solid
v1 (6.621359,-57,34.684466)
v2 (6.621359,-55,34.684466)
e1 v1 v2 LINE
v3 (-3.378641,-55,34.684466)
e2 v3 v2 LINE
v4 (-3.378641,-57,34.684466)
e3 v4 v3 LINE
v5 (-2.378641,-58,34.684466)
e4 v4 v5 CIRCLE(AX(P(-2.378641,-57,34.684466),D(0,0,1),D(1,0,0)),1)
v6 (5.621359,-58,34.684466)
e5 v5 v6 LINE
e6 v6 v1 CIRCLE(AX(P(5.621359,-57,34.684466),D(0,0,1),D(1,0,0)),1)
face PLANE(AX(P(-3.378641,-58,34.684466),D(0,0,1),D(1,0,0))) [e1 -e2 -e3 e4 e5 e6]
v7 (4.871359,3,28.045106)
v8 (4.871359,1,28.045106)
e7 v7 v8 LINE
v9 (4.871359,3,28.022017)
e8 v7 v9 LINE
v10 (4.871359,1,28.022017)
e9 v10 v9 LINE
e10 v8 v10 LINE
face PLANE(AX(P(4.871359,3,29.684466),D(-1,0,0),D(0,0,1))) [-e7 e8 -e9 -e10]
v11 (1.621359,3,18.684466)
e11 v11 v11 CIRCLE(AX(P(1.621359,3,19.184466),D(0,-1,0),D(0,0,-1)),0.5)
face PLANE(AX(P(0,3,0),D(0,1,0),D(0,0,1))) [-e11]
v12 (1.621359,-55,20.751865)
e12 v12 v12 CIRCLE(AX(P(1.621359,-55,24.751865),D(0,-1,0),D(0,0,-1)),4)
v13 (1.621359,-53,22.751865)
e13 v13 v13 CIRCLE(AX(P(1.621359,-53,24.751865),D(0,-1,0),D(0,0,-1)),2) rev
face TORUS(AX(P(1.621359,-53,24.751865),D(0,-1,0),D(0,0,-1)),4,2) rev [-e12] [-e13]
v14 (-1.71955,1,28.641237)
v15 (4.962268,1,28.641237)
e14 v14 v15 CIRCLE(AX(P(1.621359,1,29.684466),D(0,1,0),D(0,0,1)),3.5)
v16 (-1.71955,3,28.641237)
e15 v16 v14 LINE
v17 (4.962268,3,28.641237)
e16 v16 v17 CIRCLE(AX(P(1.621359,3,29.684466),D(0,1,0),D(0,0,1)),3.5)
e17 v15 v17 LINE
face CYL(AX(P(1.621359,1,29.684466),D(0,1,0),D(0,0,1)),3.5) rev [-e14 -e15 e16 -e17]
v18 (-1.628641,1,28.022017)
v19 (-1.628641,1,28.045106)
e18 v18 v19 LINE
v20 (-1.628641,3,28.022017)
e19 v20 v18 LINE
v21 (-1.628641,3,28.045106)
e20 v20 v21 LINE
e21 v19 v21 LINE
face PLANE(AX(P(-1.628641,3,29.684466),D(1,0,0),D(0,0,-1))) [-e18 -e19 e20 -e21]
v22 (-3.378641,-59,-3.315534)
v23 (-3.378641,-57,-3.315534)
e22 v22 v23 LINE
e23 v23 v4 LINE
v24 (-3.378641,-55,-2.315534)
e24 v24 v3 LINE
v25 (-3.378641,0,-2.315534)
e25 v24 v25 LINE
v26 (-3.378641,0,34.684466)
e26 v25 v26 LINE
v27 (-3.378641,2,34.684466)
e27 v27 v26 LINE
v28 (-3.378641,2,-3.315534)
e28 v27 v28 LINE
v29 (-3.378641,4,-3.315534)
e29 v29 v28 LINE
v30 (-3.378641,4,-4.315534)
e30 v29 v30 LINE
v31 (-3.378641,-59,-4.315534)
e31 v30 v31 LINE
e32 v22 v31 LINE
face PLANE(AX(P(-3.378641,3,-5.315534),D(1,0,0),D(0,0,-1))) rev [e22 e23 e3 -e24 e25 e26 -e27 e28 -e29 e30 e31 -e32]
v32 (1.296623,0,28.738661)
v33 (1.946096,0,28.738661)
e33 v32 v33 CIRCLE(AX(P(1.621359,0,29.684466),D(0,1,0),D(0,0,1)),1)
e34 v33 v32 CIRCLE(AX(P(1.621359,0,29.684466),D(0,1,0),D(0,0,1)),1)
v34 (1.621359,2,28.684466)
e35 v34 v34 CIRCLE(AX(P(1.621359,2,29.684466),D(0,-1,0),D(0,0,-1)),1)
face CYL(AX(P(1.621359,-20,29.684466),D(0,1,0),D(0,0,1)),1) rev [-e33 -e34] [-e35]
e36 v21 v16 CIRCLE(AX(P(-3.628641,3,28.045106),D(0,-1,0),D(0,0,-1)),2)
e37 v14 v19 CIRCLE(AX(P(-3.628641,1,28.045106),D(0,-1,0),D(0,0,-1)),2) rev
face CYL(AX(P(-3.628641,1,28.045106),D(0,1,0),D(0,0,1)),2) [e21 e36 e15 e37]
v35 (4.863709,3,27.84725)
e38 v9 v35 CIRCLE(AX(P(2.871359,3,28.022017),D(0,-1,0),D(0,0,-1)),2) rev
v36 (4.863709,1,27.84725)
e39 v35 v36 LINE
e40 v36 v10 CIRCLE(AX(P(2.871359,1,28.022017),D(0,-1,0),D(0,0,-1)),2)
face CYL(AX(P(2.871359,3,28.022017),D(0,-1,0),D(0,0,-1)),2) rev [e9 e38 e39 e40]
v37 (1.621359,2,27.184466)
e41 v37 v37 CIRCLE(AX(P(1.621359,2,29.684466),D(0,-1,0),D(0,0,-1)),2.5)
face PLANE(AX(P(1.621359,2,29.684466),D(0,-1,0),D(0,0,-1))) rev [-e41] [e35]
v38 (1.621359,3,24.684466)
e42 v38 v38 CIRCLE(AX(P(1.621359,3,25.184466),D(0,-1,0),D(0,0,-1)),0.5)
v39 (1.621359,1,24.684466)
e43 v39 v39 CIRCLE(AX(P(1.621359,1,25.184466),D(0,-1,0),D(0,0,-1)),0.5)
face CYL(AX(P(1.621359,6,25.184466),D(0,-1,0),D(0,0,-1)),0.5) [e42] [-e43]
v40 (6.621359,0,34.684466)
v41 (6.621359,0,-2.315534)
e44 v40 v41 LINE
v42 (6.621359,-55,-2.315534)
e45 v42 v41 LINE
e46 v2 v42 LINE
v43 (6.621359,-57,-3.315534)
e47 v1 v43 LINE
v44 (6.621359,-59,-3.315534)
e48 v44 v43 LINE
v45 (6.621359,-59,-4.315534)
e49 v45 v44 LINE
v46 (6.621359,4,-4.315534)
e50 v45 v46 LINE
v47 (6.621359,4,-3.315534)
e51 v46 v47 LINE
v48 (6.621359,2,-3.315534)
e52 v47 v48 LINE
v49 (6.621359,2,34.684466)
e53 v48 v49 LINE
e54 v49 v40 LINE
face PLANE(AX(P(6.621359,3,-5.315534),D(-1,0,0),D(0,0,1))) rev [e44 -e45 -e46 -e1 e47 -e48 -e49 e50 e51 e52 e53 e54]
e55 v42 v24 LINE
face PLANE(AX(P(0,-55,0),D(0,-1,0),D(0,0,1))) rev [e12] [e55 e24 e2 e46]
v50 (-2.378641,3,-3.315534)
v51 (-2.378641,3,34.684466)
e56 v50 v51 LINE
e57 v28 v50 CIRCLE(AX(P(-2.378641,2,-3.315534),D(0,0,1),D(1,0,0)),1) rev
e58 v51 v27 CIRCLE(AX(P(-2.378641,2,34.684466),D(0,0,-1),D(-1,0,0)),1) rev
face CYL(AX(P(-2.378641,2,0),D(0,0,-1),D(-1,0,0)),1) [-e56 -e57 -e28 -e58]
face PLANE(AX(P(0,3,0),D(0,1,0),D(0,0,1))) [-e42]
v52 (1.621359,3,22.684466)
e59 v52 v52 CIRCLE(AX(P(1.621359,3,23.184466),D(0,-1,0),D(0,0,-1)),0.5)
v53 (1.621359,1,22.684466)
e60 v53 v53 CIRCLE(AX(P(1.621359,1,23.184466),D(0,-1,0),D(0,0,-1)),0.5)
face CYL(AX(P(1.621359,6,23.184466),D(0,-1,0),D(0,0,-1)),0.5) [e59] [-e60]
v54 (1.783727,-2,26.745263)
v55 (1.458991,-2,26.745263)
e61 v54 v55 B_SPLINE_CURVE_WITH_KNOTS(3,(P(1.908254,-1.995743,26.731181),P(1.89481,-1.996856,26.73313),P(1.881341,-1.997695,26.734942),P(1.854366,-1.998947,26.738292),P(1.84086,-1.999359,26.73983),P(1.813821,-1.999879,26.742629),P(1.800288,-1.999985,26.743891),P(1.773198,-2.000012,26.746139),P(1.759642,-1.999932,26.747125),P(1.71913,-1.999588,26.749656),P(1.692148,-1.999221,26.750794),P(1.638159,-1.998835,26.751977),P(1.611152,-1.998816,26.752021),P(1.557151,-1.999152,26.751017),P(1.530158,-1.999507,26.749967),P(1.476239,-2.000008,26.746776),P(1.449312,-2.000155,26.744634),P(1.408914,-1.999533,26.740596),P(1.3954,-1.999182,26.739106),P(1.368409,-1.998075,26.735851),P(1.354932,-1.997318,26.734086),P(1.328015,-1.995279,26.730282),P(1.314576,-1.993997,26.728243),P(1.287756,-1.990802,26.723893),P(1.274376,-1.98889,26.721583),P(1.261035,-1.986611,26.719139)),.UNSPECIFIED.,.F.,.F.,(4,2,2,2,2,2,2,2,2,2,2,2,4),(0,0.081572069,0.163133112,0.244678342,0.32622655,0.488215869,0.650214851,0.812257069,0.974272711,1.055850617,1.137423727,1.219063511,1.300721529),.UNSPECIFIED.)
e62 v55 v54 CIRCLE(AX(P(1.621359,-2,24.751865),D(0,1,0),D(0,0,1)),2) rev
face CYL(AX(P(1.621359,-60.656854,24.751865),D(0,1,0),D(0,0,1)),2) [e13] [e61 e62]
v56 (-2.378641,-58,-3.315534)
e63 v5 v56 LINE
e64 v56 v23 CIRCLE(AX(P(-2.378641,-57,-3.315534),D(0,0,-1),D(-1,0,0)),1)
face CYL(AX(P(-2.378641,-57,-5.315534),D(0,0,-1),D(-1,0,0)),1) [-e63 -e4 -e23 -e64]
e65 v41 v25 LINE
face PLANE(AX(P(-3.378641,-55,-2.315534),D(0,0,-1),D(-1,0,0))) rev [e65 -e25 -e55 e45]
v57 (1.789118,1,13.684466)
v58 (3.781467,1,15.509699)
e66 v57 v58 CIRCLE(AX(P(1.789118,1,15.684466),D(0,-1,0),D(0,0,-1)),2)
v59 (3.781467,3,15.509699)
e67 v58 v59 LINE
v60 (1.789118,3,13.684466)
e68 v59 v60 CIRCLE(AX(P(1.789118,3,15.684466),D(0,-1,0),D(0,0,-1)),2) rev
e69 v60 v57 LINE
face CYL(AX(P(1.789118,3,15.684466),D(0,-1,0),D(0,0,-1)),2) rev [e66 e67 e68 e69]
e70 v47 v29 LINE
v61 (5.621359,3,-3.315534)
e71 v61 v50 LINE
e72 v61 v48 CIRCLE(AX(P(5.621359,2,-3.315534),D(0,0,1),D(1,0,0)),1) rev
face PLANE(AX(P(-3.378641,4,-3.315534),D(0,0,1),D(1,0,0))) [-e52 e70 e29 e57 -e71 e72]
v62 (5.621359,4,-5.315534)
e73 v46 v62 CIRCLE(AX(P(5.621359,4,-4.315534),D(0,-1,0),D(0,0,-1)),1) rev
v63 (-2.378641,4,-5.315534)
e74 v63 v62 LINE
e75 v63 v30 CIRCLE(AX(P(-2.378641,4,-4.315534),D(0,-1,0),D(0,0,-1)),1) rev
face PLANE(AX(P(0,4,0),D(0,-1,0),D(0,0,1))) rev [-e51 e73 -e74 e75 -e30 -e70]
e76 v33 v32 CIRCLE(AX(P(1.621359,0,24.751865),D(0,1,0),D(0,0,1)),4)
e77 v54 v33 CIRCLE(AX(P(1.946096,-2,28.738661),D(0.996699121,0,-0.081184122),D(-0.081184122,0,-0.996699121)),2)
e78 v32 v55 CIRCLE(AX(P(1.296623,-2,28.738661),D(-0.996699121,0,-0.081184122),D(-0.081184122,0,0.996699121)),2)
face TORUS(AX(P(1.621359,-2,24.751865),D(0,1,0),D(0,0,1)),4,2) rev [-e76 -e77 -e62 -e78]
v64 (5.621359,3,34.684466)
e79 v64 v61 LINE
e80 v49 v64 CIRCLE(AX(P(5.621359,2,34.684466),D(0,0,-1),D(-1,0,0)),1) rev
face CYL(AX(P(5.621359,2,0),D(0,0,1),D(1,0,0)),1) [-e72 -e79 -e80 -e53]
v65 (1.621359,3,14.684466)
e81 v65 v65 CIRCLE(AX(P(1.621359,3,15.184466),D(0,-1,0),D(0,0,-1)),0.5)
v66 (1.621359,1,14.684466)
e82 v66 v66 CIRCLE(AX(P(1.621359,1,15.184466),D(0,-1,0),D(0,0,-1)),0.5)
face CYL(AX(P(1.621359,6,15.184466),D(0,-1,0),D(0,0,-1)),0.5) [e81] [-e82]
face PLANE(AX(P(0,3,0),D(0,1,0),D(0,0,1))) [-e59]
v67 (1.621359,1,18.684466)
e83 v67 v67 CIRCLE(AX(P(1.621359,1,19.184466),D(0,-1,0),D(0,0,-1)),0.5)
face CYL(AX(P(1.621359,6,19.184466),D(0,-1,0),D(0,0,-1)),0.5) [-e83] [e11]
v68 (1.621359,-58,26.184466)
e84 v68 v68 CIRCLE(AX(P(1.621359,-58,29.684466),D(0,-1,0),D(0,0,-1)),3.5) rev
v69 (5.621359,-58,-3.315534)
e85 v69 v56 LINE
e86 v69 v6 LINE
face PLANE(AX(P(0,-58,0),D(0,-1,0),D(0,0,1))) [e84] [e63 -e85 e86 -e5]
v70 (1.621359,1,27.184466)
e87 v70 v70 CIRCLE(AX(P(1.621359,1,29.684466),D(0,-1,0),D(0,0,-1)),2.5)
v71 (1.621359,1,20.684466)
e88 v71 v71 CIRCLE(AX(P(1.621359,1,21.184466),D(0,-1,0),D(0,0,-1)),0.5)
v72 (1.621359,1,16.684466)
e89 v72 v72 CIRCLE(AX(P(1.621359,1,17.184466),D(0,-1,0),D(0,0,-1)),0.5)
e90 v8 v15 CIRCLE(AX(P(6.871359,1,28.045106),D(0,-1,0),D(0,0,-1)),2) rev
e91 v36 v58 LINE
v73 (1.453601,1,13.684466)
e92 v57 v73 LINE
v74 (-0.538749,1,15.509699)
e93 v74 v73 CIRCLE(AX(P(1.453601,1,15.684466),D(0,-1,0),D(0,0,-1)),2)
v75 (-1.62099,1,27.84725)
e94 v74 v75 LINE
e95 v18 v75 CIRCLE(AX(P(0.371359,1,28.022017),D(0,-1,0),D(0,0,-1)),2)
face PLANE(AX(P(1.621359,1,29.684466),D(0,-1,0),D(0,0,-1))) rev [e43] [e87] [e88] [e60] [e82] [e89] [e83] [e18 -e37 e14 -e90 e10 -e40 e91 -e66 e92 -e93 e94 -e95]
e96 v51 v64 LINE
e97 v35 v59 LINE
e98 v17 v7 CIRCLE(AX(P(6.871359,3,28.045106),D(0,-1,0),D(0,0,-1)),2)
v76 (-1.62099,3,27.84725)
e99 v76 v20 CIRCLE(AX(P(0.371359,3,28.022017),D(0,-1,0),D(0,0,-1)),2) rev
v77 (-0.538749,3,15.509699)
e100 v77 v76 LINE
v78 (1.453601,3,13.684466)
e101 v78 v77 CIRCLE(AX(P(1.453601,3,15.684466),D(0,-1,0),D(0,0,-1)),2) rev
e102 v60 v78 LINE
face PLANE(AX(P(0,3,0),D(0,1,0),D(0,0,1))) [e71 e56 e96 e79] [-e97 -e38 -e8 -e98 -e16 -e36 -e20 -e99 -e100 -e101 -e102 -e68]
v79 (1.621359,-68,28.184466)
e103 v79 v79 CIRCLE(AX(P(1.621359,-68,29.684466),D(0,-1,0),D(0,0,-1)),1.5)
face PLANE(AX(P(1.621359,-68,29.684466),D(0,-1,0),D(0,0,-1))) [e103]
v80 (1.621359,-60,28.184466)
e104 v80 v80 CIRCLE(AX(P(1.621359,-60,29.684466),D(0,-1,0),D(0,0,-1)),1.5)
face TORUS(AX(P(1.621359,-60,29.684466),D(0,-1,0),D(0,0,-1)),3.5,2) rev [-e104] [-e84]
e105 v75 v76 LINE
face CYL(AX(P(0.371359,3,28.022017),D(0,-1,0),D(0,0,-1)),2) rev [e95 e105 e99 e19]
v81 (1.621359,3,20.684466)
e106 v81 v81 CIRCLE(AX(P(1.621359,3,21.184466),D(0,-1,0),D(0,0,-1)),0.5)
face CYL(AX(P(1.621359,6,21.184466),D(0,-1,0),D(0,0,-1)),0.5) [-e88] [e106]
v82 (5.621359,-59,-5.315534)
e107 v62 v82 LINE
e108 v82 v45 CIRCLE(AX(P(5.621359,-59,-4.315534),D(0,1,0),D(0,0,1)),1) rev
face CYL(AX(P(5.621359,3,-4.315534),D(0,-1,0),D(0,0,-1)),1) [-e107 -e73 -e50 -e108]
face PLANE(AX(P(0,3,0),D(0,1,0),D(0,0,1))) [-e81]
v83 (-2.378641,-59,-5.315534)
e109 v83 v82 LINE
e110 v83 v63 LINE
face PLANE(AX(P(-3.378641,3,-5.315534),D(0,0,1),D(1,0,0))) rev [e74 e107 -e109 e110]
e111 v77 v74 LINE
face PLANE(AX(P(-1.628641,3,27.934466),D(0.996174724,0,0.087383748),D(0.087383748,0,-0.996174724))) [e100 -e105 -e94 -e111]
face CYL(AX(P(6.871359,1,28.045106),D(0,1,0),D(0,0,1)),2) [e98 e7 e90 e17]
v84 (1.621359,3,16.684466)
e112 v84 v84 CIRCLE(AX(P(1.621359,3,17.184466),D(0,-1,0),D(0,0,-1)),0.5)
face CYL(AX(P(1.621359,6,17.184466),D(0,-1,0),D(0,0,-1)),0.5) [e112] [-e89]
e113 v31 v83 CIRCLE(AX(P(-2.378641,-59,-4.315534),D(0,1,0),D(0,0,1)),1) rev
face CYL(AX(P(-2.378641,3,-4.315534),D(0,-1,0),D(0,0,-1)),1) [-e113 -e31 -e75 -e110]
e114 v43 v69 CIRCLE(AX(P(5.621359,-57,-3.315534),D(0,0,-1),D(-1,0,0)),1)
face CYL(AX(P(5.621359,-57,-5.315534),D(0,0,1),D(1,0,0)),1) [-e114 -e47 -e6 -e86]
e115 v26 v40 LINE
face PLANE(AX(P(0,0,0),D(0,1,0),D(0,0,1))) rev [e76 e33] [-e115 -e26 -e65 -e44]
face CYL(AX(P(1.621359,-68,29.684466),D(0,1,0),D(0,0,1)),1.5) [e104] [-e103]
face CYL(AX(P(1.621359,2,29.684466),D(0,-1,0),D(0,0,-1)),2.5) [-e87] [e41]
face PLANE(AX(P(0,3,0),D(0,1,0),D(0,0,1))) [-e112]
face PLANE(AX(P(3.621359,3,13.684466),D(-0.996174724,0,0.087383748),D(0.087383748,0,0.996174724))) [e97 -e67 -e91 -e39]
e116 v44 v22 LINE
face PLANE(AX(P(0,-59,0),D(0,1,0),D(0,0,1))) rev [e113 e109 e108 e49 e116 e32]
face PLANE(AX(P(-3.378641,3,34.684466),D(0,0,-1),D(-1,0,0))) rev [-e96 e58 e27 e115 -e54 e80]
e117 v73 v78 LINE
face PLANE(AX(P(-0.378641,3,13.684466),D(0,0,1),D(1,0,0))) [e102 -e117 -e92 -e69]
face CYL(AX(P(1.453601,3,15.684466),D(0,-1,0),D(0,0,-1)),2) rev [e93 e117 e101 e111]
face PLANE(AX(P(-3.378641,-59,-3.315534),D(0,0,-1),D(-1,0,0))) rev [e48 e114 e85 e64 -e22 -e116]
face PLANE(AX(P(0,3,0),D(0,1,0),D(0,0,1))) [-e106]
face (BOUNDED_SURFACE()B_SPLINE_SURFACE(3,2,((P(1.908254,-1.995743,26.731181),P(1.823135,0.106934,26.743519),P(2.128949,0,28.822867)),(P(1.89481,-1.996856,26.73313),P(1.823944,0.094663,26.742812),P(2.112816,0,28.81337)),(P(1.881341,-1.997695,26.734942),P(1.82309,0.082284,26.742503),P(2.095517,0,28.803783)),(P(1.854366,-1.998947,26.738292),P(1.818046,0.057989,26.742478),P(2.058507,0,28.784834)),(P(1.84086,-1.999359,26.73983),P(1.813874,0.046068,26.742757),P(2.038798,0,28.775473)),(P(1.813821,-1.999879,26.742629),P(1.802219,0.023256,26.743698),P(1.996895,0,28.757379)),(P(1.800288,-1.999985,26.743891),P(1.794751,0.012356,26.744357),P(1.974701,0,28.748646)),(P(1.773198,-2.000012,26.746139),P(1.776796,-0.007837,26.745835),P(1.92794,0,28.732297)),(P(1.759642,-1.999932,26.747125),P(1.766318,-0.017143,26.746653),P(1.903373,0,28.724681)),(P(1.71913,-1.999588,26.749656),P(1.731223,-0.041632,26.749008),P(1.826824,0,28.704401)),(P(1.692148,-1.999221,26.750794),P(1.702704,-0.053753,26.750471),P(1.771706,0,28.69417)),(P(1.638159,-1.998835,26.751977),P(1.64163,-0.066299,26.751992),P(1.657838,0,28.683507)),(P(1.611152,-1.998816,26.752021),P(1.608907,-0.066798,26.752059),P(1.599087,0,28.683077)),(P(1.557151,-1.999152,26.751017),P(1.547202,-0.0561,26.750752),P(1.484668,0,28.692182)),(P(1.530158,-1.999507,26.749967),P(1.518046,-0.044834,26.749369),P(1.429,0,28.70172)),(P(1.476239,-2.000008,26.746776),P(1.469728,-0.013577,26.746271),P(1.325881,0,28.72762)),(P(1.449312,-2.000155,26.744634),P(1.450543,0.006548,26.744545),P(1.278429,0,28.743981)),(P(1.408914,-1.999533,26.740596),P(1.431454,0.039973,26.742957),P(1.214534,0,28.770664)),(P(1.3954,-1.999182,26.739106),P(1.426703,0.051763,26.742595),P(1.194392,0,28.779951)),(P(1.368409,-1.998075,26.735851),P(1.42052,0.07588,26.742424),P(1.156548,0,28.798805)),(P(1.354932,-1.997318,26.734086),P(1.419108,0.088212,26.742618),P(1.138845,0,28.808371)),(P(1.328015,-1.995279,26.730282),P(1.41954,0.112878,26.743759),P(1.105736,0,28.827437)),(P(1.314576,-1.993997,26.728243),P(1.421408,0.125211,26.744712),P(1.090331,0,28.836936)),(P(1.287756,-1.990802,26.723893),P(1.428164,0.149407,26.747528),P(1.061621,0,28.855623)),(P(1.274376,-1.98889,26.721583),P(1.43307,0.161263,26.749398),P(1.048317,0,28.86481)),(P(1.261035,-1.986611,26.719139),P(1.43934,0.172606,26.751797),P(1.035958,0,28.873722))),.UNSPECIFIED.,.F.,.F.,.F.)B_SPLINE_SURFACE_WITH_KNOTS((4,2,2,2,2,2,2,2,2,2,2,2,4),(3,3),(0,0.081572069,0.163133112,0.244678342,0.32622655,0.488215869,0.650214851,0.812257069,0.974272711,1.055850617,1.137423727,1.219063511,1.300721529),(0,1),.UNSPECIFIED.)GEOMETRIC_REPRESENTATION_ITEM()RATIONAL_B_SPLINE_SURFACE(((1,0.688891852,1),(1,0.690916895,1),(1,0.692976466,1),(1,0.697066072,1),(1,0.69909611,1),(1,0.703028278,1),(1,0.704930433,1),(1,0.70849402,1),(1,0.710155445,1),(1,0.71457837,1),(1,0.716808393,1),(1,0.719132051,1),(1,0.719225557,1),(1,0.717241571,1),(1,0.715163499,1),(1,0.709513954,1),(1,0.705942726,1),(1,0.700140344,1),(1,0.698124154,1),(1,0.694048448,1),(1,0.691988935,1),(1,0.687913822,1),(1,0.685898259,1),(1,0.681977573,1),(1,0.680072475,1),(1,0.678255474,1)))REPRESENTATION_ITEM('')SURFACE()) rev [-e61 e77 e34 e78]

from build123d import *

# Parameters (mm, degrees)
SKETCH1_W             = 10
SKETCH1_H             = 40
BOSS_EXTRUDE1_DEPTH   = 3
CAVITY4_START         = 1
CAVITY4_OUTLINE_R     = 2.5
CAVITY4_OUTLINE_R_2   = 0.5
CAVITY4_DEPTH         = 2
CAVITY4_START_2       = 2
CAVITY4_2_OUTLINE_R   = 2.5
CAVITY4_2_OUTLINE_R_2 = 1
CAVITY4_2_DEPTH       = 1
CUT_EXTRUDE4_START    = -23
SKETCH5_R             = 1
CUT_EXTRUDE4_DEPTH    = 23
SKETCH7_W             = 10
SKETCH7_H             = 3
BOSS_EXTRUDE3_DEPTH   = 55
SKETCH8_R             = 1.5
BOSS_EXTRUDE4_DEPTH   = 10
SKETCH9_W             = 10
SKETCH9_H             = 2
BOSS_EXTRUDE5_DEPTH   = 1
FILLET2_R             = 1
FILLET3_R             = 1
FILLET4_R             = 2
SKETCH10_R            = 2
BOSS_EXTRUDE6_DEPTH   = 55
FILLET5_R             = 2
FILLET6_R             = 1


# Read off the part's stored shape, not the designer's step: Cavity4
with BuildPart() as part:
    # Sketch1 → Boss-Extrude1 (new body)
    with BuildSketch(Plane(origin=(0, 0, 0), x_dir=(1, 0, 0), z_dir=(0, 1, 0))):
        with Locations((1.621359223, -14.684466019)):
            Rectangle(SKETCH1_W, SKETCH1_H)
    boss_extrude1 = extrude(amount=BOSS_EXTRUDE1_DEPTH)

    # Cavity4 outline → Cavity4 (cut)
    with BuildSketch(Plane(origin=(0, 0, 0), x_dir=(1, 0, 0), z_dir=(0, 1, 0)).offset(CAVITY4_START)):
        with BuildLine():
            Line((-0.538748891, -15.509698524), (-1.620990225, -27.847249725))
            ThreePointArc((-1.620990225, -27.847249725), (-1.626727223, -27.934549786), (-1.628640777, -28.022017221))
            Line((-1.628640777, -28.022017221), (-1.628640777, -28.045106388))
            ThreePointArc((-1.628640777, -28.045106388), (-1.65149867, -28.346617733), (-1.719549868, -28.641237163))
            ThreePointArc((-1.719549868, -28.641237163), (1.621359223, -33.184466019), (4.962268314, -28.641237163))
            ThreePointArc((4.962268314, -28.641237163), (4.894217117, -28.346617733), (4.871359223, -28.045106388))
            Line((4.871359223, -28.045106388), (4.871359223, -28.022017221))
            ThreePointArc((4.871359223, -28.022017221), (4.86944567, -27.934549786), (4.863708671, -27.847249725))
            Line((4.863708671, -27.847249725), (3.781467338, -15.509698524))
            ThreePointArc((3.781467338, -15.509698524), (3.14012955, -14.209756728), (1.78911789, -13.684466019))
            Line((1.78911789, -13.684466019), (1.453600557, -13.684466019))
            ThreePointArc((1.453600557, -13.684466019), (0.102588897, -14.209756728), (-0.538748891, -15.509698524))
        make_face()
        with Locations((1.621359223, -29.684466019)):
            Circle(CAVITY4_OUTLINE_R, mode=Mode.SUBTRACT)
        with Locations((1.621359223, -25.184466019)):
            Circle(CAVITY4_OUTLINE_R_2, mode=Mode.SUBTRACT)
        with Locations((1.621359223, -23.184466019)):
            Circle(CAVITY4_OUTLINE_R_2, mode=Mode.SUBTRACT)
        with Locations((1.621359223, -21.184466019)):
            Circle(CAVITY4_OUTLINE_R_2, mode=Mode.SUBTRACT)
        with Locations((1.621359223, -19.184466019)):
            Circle(CAVITY4_OUTLINE_R_2, mode=Mode.SUBTRACT)
        with Locations((1.621359223, -17.184466019)):
            Circle(CAVITY4_OUTLINE_R_2, mode=Mode.SUBTRACT)
        with Locations((1.621359223, -15.184466019)):
            Circle(CAVITY4_OUTLINE_R_2, mode=Mode.SUBTRACT)
    extrude(amount=CAVITY4_DEPTH, mode=Mode.SUBTRACT)

    # Cavity4 2 outline → Cavity4 2 (cut)
    with BuildSketch(Plane(origin=(0, 0, 0), x_dir=(1, 0, 0), z_dir=(0, 1, 0)).offset(CAVITY4_START_2)):
        with Locations((1.621359223, -29.684466019)):
            Circle(CAVITY4_2_OUTLINE_R)
        with Locations((1.621359223, -29.684466019)):
            Circle(CAVITY4_2_OUTLINE_R_2, mode=Mode.SUBTRACT)
    extrude(amount=CAVITY4_2_DEPTH, mode=Mode.SUBTRACT)

    # Sketch5 → Cut-Extrude4 (cut)
    with BuildSketch(Plane(origin=(0, 3, 0), x_dir=(1, 0, 0), z_dir=(0, 1, 0)).offset(CUT_EXTRUDE4_START)):
        with Locations(Location((1.621359223, -29.684466019, 0), (0, 0, 270))):
            Circle(SKETCH5_R)
    extrude(amount=CUT_EXTRUDE4_DEPTH, mode=Mode.SUBTRACT)

    # Sketch7 → Boss-Extrude3 (add)
    with BuildSketch(Plane.XZ):
        with Locations((1.621359223, -3.815533981)):
            Rectangle(SKETCH7_W, SKETCH7_H)
    extrude(amount=BOSS_EXTRUDE3_DEPTH)

    # Mirror1: Boss-Extrude1 across plane
    add(boss_extrude1.mirror(Plane(origin=(0, -27.5, 0), x_dir=(0, 0, 1), z_dir=(0, -1, 0))))

    # Sketch8 → Boss-Extrude4 (add)
    with BuildSketch(Plane.XZ.offset(58)):
        with Locations(Location((1.621359223, 29.684466019, 0), (0, 0, 270))):
            Circle(SKETCH8_R)
    extrude(amount=BOSS_EXTRUDE4_DEPTH)

    # Sketch9 → Boss-Extrude5 (add)
    with BuildSketch(Plane.XZ.offset(58)):
        with Locations((1.621359223, -4.315533981)):
            Rectangle(SKETCH9_W, SKETCH9_H)
    boss_extrude5 = extrude(amount=BOSS_EXTRUDE5_DEPTH)

    # Mirror2: Boss-Extrude5 across plane
    add(boss_extrude5.mirror(Plane(origin=(0, -27.5, 0), x_dir=(0, 0, 1), z_dir=(0, -1, 0))))

    # Fillet2
    fillet2_edges = [part.edges().sort_by_distance(p)[0] for p in [
        (6.621359223, 3, 15.684466019),
        (6.621359223, -58, 15.684466019),
    ]]
    fillet(fillet2_edges, radius=FILLET2_R)

    # Fillet3
    fillet3_edges = [part.edges().sort_by_distance(p)[0] for p in [
        (-3.378640777, -58, 15.684466019),
        (-3.378640777, 3, 15.684466019),
    ]]
    fillet(fillet3_edges, radius=FILLET3_R)

    # Fillet4
    fillet4_edges = [part.edges().sort_by_distance(p)[0] for p in [
        (1.621359223, -58, 31.184466019),
    ]]
    fillet(fillet4_edges, radius=FILLET4_R)

    # Sketch10 → Boss-Extrude6 (add)
    with BuildSketch(Plane.XZ):
        with Locations(Location((1.621359223, 24.751865002, 0), (0, 0, 90))):
            Circle(SKETCH10_R)
    extrude(amount=BOSS_EXTRUDE6_DEPTH)

    # Fillet5
    fillet5_edges = [part.edges().sort_by_distance(p)[0] for p in [
        (1.621359223, -55, 22.751865002),
        (1.621359223, 0, 22.751865002),
    ]]
    fillet(fillet5_edges, radius=FILLET5_R)

    # Fillet6
    fillet6_edges = [part.edges().sort_by_distance(p)[0] for p in [
        (-3.378640777, -27.5, -5.315533981),
        (6.621359223, -27.5, -5.315533981),
    ]]
    fillet(fillet6_edges, radius=FILLET6_R)


solid = part.part
